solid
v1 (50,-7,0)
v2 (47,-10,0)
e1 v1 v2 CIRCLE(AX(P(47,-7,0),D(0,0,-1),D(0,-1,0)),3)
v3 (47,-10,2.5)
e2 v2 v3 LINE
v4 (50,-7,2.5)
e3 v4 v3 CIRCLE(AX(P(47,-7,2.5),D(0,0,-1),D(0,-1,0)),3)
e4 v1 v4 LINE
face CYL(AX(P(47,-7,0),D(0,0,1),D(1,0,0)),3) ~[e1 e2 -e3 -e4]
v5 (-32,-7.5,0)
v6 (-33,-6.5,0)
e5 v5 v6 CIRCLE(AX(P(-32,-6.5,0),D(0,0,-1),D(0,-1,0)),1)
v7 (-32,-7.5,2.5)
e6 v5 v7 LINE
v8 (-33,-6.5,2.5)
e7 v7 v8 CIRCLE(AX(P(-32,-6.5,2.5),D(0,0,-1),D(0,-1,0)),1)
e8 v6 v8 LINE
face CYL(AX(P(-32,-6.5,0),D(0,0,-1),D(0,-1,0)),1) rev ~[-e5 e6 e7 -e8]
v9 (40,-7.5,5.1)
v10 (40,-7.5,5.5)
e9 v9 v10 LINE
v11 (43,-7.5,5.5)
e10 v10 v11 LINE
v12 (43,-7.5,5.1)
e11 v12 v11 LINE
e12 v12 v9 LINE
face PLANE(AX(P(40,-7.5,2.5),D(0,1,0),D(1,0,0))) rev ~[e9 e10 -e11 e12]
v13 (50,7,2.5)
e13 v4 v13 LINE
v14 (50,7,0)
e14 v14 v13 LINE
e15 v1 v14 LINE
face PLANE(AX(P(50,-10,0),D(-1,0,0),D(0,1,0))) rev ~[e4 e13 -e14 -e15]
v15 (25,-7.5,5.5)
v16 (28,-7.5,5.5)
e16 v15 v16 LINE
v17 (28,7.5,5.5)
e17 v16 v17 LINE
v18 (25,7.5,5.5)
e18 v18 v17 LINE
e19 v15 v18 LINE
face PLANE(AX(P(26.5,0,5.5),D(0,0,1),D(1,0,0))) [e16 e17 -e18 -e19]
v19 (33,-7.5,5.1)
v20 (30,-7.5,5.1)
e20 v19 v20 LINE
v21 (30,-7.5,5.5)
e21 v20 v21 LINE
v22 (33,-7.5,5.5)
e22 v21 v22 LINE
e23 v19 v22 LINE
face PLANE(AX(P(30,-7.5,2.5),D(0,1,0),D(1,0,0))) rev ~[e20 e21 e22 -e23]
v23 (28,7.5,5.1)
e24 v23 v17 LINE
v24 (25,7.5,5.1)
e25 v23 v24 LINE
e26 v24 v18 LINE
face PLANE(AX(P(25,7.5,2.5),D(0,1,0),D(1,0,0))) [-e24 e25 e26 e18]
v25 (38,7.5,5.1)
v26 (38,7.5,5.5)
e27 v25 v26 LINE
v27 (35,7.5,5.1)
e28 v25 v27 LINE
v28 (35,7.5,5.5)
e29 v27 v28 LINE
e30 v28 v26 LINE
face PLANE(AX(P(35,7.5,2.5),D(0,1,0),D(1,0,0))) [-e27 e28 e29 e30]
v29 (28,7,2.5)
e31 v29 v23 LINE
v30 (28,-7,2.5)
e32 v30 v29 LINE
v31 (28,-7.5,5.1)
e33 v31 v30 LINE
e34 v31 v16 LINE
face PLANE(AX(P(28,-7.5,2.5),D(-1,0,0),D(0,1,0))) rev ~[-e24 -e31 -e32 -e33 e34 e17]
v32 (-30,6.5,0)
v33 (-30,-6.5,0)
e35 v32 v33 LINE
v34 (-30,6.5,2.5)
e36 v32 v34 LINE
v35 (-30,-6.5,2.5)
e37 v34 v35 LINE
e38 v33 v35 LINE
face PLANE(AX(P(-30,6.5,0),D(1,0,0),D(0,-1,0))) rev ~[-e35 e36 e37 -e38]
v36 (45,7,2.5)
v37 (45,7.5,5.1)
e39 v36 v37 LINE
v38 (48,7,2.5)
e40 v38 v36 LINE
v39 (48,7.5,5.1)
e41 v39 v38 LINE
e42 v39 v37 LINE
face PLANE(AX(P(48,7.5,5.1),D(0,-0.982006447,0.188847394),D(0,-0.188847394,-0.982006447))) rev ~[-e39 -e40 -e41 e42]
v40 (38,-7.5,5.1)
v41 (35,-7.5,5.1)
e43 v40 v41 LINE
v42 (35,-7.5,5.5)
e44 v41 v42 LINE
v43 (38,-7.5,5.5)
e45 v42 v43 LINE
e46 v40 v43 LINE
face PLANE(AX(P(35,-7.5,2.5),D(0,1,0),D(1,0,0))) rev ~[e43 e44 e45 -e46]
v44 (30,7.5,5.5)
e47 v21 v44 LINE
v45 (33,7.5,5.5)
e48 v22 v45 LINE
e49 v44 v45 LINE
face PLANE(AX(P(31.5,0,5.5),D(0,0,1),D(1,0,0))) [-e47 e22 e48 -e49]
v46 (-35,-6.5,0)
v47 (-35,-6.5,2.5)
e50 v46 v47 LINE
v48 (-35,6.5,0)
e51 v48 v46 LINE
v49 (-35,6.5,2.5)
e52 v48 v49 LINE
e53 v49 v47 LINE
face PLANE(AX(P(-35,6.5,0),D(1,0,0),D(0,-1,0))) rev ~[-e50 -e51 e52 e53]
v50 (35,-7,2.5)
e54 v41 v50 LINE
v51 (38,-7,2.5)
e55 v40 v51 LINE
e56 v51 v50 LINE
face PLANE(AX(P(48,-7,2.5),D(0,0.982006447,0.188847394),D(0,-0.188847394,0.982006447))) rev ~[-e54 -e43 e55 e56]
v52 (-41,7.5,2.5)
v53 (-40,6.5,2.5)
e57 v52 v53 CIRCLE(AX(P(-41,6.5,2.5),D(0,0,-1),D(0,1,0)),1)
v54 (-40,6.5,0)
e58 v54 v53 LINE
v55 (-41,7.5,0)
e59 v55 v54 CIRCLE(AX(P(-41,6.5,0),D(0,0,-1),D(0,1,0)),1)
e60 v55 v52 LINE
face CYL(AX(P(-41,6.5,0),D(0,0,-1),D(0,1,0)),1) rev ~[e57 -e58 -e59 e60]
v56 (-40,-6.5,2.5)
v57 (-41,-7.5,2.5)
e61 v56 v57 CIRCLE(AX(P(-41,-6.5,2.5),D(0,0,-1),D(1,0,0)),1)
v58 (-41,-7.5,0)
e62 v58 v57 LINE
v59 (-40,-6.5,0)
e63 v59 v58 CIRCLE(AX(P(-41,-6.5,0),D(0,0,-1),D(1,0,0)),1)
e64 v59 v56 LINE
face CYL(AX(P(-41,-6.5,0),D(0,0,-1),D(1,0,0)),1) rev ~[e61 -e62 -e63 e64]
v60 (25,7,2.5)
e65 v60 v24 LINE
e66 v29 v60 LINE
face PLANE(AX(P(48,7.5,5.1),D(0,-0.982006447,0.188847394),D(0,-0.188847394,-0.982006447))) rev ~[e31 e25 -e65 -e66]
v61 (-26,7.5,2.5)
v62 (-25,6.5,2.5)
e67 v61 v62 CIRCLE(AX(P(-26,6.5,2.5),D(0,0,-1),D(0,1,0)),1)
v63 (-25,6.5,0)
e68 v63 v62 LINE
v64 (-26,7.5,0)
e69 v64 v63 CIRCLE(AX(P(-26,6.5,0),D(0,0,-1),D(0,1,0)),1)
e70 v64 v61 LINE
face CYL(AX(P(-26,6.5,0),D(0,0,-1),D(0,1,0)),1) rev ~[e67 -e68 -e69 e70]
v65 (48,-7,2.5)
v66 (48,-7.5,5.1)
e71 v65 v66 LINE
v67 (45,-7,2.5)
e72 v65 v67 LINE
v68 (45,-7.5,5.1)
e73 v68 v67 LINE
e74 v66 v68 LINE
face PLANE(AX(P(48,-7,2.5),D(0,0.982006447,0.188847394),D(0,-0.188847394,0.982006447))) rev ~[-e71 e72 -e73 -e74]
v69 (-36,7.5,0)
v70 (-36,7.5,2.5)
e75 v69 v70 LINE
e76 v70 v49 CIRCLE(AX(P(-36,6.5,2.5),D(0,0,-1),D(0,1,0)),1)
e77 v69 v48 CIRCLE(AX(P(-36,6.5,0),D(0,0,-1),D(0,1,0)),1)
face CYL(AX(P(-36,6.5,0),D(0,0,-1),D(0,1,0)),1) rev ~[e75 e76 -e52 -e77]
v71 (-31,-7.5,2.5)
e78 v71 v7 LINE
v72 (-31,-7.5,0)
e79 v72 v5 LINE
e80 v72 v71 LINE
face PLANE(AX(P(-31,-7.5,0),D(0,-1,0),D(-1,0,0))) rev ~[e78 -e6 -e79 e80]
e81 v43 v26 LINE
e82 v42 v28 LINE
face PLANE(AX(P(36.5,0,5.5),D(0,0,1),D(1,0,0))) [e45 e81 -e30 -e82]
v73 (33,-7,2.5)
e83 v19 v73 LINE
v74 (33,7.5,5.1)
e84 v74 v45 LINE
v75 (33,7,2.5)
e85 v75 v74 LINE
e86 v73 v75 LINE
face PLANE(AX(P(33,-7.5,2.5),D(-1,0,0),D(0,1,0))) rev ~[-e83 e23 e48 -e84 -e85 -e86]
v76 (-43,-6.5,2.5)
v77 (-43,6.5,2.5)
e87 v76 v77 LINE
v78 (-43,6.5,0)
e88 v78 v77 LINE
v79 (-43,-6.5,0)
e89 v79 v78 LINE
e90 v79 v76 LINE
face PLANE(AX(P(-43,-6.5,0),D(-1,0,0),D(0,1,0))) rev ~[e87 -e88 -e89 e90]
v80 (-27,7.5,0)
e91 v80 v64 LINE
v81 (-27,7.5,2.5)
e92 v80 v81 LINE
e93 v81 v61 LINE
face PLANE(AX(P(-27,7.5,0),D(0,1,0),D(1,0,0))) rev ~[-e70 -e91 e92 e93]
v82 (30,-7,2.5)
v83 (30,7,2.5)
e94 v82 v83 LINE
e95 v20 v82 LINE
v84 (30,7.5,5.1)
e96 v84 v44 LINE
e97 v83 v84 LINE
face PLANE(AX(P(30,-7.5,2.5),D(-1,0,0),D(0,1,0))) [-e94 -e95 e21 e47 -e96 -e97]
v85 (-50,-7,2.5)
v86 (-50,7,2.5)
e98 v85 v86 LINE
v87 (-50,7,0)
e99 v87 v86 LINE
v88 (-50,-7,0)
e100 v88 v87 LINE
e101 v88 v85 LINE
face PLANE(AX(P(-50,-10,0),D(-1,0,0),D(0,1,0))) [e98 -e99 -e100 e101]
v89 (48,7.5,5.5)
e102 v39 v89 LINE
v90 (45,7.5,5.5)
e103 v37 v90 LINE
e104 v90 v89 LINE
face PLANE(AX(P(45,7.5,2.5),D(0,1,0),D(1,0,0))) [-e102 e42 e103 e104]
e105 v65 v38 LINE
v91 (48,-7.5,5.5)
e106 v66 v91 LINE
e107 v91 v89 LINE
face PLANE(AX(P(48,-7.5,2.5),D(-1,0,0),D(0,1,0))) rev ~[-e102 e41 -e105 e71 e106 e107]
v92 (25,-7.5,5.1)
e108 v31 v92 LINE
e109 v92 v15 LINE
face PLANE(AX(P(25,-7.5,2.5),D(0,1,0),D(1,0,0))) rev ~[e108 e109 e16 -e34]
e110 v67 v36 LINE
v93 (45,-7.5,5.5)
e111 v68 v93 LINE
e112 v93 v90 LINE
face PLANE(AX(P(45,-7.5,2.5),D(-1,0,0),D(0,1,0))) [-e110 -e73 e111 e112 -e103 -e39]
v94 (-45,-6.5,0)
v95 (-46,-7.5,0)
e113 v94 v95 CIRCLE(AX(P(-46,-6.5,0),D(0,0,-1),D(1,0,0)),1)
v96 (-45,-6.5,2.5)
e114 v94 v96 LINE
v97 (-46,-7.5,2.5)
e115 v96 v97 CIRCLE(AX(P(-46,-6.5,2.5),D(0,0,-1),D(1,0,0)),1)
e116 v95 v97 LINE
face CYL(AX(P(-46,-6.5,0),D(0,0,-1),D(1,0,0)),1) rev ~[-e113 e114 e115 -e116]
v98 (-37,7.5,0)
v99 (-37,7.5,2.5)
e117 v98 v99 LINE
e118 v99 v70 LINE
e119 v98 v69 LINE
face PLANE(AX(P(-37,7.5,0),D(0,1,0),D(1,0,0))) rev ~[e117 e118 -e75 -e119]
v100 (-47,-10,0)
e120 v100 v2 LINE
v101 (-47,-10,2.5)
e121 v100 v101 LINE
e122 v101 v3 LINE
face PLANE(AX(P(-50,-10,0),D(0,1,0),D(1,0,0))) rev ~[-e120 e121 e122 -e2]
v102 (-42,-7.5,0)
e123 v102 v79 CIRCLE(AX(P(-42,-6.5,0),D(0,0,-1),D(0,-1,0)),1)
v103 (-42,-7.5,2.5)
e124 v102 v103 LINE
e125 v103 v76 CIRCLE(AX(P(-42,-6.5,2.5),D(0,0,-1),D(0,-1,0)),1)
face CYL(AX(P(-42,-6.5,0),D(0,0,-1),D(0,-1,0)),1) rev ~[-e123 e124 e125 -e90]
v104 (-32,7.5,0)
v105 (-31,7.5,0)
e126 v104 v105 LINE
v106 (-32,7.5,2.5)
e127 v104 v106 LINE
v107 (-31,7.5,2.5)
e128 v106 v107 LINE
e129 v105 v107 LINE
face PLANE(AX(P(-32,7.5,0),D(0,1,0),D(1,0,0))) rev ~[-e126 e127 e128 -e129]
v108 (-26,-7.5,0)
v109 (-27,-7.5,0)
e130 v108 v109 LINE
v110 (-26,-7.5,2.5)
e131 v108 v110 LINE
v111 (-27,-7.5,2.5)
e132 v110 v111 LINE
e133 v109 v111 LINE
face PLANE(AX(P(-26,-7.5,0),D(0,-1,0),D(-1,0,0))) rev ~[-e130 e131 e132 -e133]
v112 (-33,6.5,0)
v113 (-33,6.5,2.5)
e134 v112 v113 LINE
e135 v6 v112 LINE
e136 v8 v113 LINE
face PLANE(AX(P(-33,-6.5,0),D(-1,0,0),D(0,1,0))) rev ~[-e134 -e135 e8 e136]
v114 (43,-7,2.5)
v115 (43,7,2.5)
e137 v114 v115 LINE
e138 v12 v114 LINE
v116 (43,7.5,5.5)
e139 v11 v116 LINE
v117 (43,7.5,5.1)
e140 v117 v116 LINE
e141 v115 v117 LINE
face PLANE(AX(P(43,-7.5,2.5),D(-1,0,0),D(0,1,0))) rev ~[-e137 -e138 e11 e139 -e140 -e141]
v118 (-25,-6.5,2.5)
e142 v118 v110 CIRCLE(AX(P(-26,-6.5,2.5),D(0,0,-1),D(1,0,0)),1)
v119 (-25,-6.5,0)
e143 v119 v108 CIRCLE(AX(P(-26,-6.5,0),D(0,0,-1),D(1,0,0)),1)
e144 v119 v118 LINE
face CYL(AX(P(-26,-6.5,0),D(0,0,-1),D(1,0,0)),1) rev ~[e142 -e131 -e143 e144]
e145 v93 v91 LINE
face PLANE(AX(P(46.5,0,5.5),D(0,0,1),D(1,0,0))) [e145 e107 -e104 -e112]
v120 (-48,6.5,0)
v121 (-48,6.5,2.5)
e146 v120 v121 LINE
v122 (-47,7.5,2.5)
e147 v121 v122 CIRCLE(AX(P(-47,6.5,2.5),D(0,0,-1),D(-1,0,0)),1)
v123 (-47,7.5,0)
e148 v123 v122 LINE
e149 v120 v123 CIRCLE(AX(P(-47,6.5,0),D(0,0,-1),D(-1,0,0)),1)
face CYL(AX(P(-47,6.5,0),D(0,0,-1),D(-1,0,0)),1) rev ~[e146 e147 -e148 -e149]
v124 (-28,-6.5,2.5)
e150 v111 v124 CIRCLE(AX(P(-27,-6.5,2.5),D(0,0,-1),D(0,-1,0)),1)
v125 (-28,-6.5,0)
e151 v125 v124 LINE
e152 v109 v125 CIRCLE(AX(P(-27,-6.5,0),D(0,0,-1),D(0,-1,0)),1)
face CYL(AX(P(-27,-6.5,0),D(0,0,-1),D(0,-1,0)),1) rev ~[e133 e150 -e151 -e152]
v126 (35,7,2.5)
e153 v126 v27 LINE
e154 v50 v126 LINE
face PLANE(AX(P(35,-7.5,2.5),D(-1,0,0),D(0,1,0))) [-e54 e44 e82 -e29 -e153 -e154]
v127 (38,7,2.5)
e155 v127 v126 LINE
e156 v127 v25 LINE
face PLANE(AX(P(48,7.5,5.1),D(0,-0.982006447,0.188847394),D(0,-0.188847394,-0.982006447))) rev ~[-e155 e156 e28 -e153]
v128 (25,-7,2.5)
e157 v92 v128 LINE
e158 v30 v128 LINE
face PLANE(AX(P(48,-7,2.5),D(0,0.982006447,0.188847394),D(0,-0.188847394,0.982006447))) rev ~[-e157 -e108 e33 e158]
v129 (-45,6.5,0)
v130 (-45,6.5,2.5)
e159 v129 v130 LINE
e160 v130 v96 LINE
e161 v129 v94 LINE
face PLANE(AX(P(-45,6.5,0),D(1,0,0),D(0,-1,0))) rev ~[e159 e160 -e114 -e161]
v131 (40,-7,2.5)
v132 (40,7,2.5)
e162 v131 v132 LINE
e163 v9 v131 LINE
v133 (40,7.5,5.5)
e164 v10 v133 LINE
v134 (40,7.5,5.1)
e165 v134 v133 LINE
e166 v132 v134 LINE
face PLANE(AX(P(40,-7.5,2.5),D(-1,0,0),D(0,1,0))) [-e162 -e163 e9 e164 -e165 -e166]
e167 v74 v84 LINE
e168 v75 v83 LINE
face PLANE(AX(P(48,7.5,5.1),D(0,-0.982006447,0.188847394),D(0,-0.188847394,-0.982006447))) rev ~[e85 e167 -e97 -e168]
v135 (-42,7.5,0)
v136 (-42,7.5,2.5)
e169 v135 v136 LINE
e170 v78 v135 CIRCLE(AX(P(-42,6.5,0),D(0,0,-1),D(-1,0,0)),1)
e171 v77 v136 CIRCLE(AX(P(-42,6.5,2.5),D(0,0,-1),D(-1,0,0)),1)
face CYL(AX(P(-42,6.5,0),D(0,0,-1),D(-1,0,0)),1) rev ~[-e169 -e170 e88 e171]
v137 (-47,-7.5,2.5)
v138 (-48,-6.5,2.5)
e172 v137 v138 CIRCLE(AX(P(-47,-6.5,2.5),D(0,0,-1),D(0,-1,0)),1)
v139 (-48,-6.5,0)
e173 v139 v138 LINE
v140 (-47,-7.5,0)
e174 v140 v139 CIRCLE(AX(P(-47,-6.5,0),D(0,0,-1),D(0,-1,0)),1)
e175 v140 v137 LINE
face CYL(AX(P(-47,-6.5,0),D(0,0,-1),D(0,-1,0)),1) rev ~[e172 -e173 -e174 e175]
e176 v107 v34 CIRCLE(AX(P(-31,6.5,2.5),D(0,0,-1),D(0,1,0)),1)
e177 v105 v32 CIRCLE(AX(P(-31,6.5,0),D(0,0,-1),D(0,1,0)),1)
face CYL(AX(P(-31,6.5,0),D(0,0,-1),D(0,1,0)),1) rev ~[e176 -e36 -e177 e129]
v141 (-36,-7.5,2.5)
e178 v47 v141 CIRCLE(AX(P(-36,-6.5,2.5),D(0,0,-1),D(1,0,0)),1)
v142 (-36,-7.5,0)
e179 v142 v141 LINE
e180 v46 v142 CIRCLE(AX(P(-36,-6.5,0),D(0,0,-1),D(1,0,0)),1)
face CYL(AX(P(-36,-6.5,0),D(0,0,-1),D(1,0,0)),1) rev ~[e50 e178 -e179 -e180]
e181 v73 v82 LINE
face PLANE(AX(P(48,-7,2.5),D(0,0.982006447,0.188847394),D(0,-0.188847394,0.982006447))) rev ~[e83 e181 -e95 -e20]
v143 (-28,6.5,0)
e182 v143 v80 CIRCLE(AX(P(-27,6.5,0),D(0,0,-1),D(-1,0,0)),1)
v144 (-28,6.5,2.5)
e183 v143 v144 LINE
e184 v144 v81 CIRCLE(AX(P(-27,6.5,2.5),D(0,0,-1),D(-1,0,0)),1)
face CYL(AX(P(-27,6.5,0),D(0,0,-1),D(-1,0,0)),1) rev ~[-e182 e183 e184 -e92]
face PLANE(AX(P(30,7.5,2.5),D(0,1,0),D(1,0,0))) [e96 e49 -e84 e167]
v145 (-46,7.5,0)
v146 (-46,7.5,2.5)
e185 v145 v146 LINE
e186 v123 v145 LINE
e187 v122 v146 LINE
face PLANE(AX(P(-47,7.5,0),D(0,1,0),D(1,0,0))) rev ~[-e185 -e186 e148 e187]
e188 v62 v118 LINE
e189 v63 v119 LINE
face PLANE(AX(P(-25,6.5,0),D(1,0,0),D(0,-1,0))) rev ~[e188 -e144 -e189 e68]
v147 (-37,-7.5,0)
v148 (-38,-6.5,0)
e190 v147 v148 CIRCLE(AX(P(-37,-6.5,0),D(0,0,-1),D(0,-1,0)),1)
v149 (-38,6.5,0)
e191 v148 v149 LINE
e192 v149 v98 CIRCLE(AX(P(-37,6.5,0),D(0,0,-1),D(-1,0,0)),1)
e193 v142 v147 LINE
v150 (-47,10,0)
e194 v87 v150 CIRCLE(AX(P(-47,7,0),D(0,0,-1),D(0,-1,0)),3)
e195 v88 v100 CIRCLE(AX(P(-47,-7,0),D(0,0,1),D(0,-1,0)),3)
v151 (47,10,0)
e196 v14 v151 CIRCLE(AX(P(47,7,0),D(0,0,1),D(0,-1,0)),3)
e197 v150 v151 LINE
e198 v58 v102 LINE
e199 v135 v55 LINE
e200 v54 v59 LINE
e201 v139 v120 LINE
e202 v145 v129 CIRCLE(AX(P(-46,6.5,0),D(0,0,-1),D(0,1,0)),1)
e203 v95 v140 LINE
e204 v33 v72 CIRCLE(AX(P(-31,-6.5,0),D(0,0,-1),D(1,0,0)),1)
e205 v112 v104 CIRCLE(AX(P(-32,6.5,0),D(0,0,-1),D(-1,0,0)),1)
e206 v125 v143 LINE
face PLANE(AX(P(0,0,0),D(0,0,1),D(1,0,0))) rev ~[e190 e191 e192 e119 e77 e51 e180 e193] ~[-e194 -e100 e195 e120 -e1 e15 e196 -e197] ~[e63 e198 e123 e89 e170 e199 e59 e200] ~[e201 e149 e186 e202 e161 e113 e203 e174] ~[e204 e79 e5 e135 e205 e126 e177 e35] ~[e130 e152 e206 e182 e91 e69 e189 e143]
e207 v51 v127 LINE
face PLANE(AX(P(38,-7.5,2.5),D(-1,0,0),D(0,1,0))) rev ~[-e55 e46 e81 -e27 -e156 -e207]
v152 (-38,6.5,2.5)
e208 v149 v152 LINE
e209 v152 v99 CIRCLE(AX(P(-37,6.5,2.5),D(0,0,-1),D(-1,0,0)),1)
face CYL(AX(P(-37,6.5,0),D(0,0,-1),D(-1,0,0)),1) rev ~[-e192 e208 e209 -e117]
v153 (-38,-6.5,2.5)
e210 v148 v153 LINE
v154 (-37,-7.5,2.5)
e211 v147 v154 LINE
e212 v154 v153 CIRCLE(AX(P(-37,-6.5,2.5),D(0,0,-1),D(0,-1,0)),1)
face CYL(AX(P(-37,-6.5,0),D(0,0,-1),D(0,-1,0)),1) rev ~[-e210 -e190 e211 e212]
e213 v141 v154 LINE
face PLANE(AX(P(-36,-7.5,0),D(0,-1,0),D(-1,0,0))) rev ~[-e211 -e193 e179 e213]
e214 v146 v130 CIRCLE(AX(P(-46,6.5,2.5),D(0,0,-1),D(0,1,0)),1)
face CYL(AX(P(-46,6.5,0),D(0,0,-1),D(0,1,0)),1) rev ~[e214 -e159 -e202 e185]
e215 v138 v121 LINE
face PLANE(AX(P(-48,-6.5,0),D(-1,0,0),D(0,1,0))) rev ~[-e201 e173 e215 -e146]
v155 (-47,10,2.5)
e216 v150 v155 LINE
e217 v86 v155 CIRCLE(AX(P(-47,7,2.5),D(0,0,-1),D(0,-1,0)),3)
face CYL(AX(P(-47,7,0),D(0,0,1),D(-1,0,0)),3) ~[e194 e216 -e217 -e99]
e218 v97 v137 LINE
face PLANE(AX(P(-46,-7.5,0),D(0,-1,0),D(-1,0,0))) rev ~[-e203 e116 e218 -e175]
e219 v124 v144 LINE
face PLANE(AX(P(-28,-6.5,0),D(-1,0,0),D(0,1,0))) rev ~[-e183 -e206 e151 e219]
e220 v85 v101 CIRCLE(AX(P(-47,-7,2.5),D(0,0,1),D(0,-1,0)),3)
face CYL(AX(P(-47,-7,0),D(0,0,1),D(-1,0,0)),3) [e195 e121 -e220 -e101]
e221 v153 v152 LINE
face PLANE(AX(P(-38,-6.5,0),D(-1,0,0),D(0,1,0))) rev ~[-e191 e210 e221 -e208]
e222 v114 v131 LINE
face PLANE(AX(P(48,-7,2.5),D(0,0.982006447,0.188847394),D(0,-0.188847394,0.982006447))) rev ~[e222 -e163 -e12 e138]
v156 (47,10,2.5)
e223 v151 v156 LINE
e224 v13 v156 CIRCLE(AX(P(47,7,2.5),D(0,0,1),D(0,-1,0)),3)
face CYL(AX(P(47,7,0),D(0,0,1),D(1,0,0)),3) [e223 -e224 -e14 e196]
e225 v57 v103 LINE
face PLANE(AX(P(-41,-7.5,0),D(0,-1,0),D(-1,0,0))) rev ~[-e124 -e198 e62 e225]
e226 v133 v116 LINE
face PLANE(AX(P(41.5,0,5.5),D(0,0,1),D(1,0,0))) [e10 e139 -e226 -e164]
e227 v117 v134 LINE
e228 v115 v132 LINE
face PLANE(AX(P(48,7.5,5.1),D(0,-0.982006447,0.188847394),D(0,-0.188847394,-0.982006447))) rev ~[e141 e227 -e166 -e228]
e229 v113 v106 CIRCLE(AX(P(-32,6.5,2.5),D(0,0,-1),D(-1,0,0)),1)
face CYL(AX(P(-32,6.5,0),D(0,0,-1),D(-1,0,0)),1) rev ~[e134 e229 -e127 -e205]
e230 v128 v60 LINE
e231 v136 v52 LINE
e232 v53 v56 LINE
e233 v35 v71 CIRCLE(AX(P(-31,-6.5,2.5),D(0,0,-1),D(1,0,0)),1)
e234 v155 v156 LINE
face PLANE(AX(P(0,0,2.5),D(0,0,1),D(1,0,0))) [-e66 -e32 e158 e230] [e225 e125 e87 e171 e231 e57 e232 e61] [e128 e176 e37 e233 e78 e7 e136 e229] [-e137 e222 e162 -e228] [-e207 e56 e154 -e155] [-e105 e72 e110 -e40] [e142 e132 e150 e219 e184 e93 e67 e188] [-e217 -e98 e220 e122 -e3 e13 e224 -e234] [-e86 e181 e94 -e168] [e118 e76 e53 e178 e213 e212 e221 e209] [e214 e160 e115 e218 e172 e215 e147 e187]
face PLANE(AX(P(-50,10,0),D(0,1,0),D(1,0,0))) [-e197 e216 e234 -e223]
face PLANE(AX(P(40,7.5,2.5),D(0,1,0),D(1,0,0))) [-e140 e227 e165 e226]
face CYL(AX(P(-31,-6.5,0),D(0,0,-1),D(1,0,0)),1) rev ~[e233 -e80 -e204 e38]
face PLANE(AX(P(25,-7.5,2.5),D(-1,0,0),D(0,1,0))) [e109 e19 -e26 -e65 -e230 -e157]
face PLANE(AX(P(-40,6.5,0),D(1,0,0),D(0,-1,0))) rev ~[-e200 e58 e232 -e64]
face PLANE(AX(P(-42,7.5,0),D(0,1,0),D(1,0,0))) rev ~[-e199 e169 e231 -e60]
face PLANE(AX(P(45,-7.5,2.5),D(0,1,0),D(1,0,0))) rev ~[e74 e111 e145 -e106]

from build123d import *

# Parameters (mm, degrees)
F0_W     = 100
F0_H     = 20
F0_W_2   = 3
F0_H_2   = 15
F1_DEPTH = 2.5
F2_W     = 3
F2_H     = 15
F3_DEPTH = 3
F5_DEPTH = 98.001
F6_R     = 3


# Not quite as in the source:
# - a feature names something its author has since deleted; it is built from what else it names


with BuildPart() as f1:
    # F0 (on Top) → F1 (new body)
    with BuildSketch(Plane.XY):
        Rectangle(F0_W, F0_H)
        with BuildLine():
            ThreePointArc((-45, -6.5), (-45.2928932188, -7.2071067812), (-46, -7.5))
            Line((-46, -7.5), (-47, -7.5))
            ThreePointArc((-47, -7.5), (-47.7071067812, -7.2071067812), (-48, -6.5))
            Line((-48, -6.5), (-48, 6.5))
            ThreePointArc((-48, 6.5), (-47.7071067812, 7.2071067812), (-47, 7.5))
            Line((-47, 7.5), (-46, 7.5))
            ThreePointArc((-46, 7.5), (-45.2928932188, 7.2071067812), (-45, 6.5))
            Line((-45, 6.5), (-45, -6.5))
        make_face(mode=Mode.SUBTRACT)
        with BuildLine():
            Line((-42, 7.5), (-41, 7.5))
            ThreePointArc((-41, 7.5), (-40.2928932188, 7.2071067812), (-40, 6.5))
            Line((-40, 6.5), (-40, -6.5))
            ThreePointArc((-40, -6.5), (-40.2928932188, -7.2071067812), (-41, -7.5))
            Line((-41, -7.5), (-42, -7.5))
            ThreePointArc((-42, -7.5), (-42.7071067812, -7.2071067812), (-43, -6.5))
            Line((-43, -6.5), (-43, 6.5))
            ThreePointArc((-43, 6.5), (-42.7071067812, 7.2071067812), (-42, 7.5))
        make_face(mode=Mode.SUBTRACT)
        with BuildLine():
            Line((-37, 7.5), (-36, 7.5))
            ThreePointArc((-36, 7.5), (-35.2928932188, 7.2071067812), (-35, 6.5))
            Line((-35, 6.5), (-35, -6.5))
            ThreePointArc((-35, -6.5), (-35.2928932188, -7.2071067812), (-36, -7.5))
            Line((-36, -7.5), (-37, -7.5))
            ThreePointArc((-37, -7.5), (-37.7071067812, -7.2071067812), (-38, -6.5))
            Line((-38, -6.5), (-38, 6.5))
            ThreePointArc((-38, 6.5), (-37.7071067812, 7.2071067812), (-37, 7.5))
        make_face(mode=Mode.SUBTRACT)
        with BuildLine():
            Line((-32, 7.5), (-31, 7.5))
            ThreePointArc((-31, 7.5), (-30.2928932188, 7.2071067812), (-30, 6.5))
            Line((-30, 6.5), (-30, -6.5))
            ThreePointArc((-30, -6.5), (-30.2928932188, -7.2071067812), (-31, -7.5))
            Line((-31, -7.5), (-32, -7.5))
            ThreePointArc((-32, -7.5), (-32.7071067812, -7.2071067812), (-33, -6.5))
            Line((-33, -6.5), (-33, 6.5))
            ThreePointArc((-33, 6.5), (-32.7071067812, 7.2071067812), (-32, 7.5))
        make_face(mode=Mode.SUBTRACT)
        with BuildLine():
            Line((-27, 7.5), (-26, 7.5))
            ThreePointArc((-26, 7.5), (-25.2928932188, 7.2071067812), (-25, 6.5))
            Line((-25, 6.5), (-25, -6.5))
            ThreePointArc((-25, -6.5), (-25.2928932188, -7.2071067812), (-26, -7.5))
            Line((-26, -7.5), (-27, -7.5))
            ThreePointArc((-27, -7.5), (-27.7071067812, -7.2071067812), (-28, -6.5))
            Line((-28, -6.5), (-28, 6.5))
            ThreePointArc((-28, 6.5), (-27.7071067812, 7.2071067812), (-27, 7.5))
        make_face(mode=Mode.SUBTRACT)
        with Locations((26.5, 0)):
            Rectangle(F0_W_2, F0_H_2, mode=Mode.SUBTRACT)
        with Locations((31.5, 0)):
            Rectangle(F0_W_2, F0_H_2, mode=Mode.SUBTRACT)
        with Locations((36.5, 0)):
            Rectangle(F0_W_2, F0_H_2, mode=Mode.SUBTRACT)
        with Locations((41.5, 0)):
            Rectangle(F0_W_2, F0_H_2, mode=Mode.SUBTRACT)
        with Locations((46.5, 0)):
            Rectangle(F0_W_2, F0_H_2, mode=Mode.SUBTRACT)
        with Locations((26.5, 0)):
            Rectangle(F0_W_2, F0_H_2)
        with Locations((31.5, 0)):
            Rectangle(F0_W_2, F0_H_2)
        with Locations((36.5, 0)):
            Rectangle(F0_W_2, F0_H_2)
        with Locations((41.5, 0)):
            Rectangle(F0_W_2, F0_H_2)
        with Locations((46.5, 0)):
            Rectangle(F0_W_2, F0_H_2)
    extrude(amount=F1_DEPTH)

    # F2 (on face) → F3 (join)
    with BuildSketch(Plane.XY.offset(2.5)):
        with Locations((26.5, 0)):
            Rectangle(F2_W, F2_H)
        with Locations((31.5, 0)):
            Rectangle(F2_W, F2_H)
        with Locations((36.5, 0)):
            Rectangle(F2_W, F2_H)
        with Locations((41.5, 0)):
            Rectangle(F2_W, F2_H)
        with Locations((46.5, 0)):
            Rectangle(F2_W, F2_H)
    extrude(amount=F3_DEPTH)

    # F4 (on face) → F5 (cut, through all)
    with BuildSketch(Plane.YZ.offset(48)):
        Polygon((-7.5, 5.1), (-7.5, 2.5), (-7, 2.5), align=None)
        Polygon((7.5, 5.1), (7, 2.5), (7.5, 2.5), align=None)
    extrude(amount=-F5_DEPTH, mode=Mode.SUBTRACT)

    # F6
    f6_edges = [f1.edges().sort_by_distance(p)[0] for p in [
        (-50, -10, 1.25),
        (50, -10, 1.25),
        (-50, 10, 1.25),
        (50, 10, 1.25),
    ]]
    fillet(f6_edges, radius=F6_R)


solid = f1.part
